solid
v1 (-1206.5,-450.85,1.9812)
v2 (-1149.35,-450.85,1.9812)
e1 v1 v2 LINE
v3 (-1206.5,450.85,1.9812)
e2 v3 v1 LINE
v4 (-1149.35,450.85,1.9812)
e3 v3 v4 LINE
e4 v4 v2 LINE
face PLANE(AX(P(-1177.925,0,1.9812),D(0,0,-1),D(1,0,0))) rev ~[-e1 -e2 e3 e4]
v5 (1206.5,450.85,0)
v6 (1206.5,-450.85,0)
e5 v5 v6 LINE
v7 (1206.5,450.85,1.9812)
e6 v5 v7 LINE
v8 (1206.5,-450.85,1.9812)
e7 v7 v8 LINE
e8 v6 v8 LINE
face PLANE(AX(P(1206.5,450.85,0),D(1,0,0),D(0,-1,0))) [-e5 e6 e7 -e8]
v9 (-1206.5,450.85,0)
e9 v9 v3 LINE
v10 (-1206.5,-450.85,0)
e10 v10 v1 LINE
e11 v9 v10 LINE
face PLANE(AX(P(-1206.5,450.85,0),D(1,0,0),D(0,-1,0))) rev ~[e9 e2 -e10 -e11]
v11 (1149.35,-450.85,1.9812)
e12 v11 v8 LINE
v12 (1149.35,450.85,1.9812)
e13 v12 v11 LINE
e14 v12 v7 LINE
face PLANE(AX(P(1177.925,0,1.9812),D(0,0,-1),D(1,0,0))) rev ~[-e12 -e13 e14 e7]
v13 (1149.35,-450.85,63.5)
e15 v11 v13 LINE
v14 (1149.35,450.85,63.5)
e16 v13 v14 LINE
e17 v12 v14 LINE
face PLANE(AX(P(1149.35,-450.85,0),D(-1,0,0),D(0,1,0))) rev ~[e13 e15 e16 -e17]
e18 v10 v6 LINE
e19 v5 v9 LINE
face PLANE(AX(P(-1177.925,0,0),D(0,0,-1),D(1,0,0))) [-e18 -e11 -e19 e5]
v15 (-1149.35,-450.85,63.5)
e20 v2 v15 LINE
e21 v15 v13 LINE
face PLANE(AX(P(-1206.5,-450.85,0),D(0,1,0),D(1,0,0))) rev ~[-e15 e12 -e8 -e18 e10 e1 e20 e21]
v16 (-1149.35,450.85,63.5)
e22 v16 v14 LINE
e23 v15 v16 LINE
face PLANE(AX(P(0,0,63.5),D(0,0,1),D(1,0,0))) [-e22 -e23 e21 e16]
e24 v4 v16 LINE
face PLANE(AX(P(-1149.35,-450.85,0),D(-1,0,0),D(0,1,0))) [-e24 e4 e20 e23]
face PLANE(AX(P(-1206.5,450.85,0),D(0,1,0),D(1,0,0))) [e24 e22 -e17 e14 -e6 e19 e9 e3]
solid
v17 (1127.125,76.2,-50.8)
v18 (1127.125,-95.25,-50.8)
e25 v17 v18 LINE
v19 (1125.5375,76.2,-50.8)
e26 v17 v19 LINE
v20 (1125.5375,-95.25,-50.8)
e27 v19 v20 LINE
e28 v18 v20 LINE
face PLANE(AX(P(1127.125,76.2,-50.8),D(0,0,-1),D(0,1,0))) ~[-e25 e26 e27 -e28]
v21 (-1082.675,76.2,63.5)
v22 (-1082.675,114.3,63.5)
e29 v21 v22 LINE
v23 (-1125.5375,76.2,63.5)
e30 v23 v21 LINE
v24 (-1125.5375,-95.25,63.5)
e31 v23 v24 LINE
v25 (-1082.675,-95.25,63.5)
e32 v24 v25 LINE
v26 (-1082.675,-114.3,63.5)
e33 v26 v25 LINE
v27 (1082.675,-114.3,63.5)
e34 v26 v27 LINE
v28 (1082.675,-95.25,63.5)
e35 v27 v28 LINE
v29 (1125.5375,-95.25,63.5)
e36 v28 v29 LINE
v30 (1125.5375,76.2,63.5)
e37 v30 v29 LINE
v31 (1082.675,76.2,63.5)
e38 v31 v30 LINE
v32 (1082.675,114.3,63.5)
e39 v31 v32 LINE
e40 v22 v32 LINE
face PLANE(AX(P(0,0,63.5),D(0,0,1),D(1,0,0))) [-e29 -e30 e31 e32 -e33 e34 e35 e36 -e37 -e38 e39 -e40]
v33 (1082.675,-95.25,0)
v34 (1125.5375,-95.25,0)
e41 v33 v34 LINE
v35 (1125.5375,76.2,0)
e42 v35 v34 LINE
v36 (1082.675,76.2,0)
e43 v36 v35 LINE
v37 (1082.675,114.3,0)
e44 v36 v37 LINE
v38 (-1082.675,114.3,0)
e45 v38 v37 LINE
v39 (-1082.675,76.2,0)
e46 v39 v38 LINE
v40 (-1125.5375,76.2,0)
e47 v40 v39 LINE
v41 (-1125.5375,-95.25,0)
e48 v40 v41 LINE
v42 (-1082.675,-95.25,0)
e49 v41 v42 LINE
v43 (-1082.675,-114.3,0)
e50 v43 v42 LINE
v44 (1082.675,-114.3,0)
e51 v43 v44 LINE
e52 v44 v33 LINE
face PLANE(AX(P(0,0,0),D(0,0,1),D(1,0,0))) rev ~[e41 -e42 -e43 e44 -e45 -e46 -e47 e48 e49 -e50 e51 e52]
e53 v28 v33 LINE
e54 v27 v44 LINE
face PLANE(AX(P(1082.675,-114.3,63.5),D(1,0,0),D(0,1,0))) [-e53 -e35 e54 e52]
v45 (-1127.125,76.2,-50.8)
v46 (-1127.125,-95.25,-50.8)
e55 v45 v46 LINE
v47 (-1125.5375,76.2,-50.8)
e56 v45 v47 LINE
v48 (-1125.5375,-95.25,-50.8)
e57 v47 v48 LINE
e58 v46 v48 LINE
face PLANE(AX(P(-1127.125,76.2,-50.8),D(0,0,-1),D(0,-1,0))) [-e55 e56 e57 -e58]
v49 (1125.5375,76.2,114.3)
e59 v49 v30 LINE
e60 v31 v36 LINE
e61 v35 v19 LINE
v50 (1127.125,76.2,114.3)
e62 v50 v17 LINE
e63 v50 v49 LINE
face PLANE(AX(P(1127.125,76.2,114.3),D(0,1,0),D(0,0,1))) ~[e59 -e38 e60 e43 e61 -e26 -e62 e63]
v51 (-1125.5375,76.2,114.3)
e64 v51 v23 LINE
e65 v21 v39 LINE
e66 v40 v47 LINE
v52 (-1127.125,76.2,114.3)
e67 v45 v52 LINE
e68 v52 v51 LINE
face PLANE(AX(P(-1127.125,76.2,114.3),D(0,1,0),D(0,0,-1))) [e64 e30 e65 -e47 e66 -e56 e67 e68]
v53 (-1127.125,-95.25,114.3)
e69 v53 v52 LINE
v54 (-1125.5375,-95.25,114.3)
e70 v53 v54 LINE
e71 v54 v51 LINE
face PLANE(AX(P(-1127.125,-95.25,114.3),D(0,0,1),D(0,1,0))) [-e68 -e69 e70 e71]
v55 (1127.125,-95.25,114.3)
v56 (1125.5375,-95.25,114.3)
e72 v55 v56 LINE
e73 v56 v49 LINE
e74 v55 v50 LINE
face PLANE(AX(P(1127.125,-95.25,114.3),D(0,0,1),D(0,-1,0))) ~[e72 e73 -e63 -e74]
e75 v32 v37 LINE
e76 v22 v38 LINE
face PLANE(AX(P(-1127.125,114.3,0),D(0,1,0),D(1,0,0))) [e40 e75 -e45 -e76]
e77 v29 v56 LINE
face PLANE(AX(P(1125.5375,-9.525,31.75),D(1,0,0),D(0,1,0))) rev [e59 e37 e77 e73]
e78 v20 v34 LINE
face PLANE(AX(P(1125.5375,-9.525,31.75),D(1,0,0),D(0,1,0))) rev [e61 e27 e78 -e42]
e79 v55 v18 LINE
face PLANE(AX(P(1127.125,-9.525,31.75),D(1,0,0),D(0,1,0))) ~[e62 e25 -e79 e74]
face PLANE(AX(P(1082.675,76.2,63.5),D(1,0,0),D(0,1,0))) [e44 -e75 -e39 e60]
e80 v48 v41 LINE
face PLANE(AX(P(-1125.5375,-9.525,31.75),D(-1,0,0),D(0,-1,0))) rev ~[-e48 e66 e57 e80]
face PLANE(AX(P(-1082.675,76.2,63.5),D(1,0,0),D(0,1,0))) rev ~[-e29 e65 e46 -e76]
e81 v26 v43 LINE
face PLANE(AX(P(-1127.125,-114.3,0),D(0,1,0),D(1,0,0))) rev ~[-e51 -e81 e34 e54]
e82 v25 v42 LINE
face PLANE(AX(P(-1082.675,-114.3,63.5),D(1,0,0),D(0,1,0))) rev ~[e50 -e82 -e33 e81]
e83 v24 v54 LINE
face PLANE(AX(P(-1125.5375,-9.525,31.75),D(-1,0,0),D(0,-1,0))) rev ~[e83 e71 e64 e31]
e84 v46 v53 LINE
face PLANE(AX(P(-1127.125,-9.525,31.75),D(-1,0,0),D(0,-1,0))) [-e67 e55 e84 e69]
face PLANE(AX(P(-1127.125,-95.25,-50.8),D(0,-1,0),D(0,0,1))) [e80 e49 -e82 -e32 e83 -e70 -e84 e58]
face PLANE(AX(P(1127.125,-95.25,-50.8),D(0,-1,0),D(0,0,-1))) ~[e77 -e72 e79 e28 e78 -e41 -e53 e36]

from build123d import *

# Parameters (mm, degrees)
F0_W     = 2298.7
F0_H     = 901.7
F1_DEPTH = 63.5
F2_W     = 57.15
F2_H     = 901.7
F3_DEPTH = 1.9812
F4_W     = 2254.25
F4_H     = 228.6
F5_DEPTH = 63.5
F6_W     = 44.45
F6_H     = 38.1
F6_H_2   = 19.05
F7_DEPTH = 63.501
F9_DEPTH = 1.5875


# Not quite as in the source:
# - a pattern or mirror of a feature is missing from the dataset's text; its kind, count and spacing are read off the source's solid


with BuildPart() as f1:
    # F0 (on Top) → F1 (new body)
    with BuildSketch(Plane.XY):
        Rectangle(F0_W, F0_H)
    extrude(amount=F1_DEPTH)

    # F2 (on face) → F3 (join)
    with BuildSketch(Plane(origin=(0, 0, 0), x_dir=(1, 0, 0), z_dir=(0, 0, -1))):
        with Locations((-1177.925, 0)):
            Rectangle(F2_W, F2_H)
        with Locations((1177.925, 0)):
            Rectangle(F2_W, F2_H)
    extrude(amount=-F3_DEPTH)


with BuildPart() as f5:
    # F4 (on Top) → F5 (new body)
    with BuildSketch(Plane.XY):
        Rectangle(F4_W, F4_H)
    extrude(amount=F5_DEPTH)

    # F6 (on face) → F7 (cut, through all)
    with BuildSketch(Plane.XY.offset(63.5)):
        with Locations((-1104.9, 95.25)):
            Rectangle(F6_W, F6_H)
        with Locations((-1104.9, -104.775)):
            Rectangle(F6_W, F6_H_2)
        with Locations((1104.9, -104.775)):
            Rectangle(F6_W, F6_H_2)
        with Locations((1104.9, 95.25)):
            Rectangle(F6_W, F6_H)
    extrude(amount=-F7_DEPTH, mode=Mode.SUBTRACT)

    # F8 (on face) → F9 (join)
    with BuildSketch(Plane(origin=(-1127.125, 0, 0), x_dir=(0, -1, 0), z_dir=(-1, 0, 0))):
        Polygon((-76.2, 114.3), (-76.2, 31.75), (-76.2, -50.8), (95.25, -50.8), (95.25, 31.75), (95.25, 114.3), align=None)
    f9 = extrude(amount=-F9_DEPTH)

    # F9_copies: F9 across plane
    add(f9.mirror(Plane(origin=(0, 0, 0), x_dir=(0, 0, 1), z_dir=(1, 0, 0))))


solid = Compound([f1.part, f5.part])
